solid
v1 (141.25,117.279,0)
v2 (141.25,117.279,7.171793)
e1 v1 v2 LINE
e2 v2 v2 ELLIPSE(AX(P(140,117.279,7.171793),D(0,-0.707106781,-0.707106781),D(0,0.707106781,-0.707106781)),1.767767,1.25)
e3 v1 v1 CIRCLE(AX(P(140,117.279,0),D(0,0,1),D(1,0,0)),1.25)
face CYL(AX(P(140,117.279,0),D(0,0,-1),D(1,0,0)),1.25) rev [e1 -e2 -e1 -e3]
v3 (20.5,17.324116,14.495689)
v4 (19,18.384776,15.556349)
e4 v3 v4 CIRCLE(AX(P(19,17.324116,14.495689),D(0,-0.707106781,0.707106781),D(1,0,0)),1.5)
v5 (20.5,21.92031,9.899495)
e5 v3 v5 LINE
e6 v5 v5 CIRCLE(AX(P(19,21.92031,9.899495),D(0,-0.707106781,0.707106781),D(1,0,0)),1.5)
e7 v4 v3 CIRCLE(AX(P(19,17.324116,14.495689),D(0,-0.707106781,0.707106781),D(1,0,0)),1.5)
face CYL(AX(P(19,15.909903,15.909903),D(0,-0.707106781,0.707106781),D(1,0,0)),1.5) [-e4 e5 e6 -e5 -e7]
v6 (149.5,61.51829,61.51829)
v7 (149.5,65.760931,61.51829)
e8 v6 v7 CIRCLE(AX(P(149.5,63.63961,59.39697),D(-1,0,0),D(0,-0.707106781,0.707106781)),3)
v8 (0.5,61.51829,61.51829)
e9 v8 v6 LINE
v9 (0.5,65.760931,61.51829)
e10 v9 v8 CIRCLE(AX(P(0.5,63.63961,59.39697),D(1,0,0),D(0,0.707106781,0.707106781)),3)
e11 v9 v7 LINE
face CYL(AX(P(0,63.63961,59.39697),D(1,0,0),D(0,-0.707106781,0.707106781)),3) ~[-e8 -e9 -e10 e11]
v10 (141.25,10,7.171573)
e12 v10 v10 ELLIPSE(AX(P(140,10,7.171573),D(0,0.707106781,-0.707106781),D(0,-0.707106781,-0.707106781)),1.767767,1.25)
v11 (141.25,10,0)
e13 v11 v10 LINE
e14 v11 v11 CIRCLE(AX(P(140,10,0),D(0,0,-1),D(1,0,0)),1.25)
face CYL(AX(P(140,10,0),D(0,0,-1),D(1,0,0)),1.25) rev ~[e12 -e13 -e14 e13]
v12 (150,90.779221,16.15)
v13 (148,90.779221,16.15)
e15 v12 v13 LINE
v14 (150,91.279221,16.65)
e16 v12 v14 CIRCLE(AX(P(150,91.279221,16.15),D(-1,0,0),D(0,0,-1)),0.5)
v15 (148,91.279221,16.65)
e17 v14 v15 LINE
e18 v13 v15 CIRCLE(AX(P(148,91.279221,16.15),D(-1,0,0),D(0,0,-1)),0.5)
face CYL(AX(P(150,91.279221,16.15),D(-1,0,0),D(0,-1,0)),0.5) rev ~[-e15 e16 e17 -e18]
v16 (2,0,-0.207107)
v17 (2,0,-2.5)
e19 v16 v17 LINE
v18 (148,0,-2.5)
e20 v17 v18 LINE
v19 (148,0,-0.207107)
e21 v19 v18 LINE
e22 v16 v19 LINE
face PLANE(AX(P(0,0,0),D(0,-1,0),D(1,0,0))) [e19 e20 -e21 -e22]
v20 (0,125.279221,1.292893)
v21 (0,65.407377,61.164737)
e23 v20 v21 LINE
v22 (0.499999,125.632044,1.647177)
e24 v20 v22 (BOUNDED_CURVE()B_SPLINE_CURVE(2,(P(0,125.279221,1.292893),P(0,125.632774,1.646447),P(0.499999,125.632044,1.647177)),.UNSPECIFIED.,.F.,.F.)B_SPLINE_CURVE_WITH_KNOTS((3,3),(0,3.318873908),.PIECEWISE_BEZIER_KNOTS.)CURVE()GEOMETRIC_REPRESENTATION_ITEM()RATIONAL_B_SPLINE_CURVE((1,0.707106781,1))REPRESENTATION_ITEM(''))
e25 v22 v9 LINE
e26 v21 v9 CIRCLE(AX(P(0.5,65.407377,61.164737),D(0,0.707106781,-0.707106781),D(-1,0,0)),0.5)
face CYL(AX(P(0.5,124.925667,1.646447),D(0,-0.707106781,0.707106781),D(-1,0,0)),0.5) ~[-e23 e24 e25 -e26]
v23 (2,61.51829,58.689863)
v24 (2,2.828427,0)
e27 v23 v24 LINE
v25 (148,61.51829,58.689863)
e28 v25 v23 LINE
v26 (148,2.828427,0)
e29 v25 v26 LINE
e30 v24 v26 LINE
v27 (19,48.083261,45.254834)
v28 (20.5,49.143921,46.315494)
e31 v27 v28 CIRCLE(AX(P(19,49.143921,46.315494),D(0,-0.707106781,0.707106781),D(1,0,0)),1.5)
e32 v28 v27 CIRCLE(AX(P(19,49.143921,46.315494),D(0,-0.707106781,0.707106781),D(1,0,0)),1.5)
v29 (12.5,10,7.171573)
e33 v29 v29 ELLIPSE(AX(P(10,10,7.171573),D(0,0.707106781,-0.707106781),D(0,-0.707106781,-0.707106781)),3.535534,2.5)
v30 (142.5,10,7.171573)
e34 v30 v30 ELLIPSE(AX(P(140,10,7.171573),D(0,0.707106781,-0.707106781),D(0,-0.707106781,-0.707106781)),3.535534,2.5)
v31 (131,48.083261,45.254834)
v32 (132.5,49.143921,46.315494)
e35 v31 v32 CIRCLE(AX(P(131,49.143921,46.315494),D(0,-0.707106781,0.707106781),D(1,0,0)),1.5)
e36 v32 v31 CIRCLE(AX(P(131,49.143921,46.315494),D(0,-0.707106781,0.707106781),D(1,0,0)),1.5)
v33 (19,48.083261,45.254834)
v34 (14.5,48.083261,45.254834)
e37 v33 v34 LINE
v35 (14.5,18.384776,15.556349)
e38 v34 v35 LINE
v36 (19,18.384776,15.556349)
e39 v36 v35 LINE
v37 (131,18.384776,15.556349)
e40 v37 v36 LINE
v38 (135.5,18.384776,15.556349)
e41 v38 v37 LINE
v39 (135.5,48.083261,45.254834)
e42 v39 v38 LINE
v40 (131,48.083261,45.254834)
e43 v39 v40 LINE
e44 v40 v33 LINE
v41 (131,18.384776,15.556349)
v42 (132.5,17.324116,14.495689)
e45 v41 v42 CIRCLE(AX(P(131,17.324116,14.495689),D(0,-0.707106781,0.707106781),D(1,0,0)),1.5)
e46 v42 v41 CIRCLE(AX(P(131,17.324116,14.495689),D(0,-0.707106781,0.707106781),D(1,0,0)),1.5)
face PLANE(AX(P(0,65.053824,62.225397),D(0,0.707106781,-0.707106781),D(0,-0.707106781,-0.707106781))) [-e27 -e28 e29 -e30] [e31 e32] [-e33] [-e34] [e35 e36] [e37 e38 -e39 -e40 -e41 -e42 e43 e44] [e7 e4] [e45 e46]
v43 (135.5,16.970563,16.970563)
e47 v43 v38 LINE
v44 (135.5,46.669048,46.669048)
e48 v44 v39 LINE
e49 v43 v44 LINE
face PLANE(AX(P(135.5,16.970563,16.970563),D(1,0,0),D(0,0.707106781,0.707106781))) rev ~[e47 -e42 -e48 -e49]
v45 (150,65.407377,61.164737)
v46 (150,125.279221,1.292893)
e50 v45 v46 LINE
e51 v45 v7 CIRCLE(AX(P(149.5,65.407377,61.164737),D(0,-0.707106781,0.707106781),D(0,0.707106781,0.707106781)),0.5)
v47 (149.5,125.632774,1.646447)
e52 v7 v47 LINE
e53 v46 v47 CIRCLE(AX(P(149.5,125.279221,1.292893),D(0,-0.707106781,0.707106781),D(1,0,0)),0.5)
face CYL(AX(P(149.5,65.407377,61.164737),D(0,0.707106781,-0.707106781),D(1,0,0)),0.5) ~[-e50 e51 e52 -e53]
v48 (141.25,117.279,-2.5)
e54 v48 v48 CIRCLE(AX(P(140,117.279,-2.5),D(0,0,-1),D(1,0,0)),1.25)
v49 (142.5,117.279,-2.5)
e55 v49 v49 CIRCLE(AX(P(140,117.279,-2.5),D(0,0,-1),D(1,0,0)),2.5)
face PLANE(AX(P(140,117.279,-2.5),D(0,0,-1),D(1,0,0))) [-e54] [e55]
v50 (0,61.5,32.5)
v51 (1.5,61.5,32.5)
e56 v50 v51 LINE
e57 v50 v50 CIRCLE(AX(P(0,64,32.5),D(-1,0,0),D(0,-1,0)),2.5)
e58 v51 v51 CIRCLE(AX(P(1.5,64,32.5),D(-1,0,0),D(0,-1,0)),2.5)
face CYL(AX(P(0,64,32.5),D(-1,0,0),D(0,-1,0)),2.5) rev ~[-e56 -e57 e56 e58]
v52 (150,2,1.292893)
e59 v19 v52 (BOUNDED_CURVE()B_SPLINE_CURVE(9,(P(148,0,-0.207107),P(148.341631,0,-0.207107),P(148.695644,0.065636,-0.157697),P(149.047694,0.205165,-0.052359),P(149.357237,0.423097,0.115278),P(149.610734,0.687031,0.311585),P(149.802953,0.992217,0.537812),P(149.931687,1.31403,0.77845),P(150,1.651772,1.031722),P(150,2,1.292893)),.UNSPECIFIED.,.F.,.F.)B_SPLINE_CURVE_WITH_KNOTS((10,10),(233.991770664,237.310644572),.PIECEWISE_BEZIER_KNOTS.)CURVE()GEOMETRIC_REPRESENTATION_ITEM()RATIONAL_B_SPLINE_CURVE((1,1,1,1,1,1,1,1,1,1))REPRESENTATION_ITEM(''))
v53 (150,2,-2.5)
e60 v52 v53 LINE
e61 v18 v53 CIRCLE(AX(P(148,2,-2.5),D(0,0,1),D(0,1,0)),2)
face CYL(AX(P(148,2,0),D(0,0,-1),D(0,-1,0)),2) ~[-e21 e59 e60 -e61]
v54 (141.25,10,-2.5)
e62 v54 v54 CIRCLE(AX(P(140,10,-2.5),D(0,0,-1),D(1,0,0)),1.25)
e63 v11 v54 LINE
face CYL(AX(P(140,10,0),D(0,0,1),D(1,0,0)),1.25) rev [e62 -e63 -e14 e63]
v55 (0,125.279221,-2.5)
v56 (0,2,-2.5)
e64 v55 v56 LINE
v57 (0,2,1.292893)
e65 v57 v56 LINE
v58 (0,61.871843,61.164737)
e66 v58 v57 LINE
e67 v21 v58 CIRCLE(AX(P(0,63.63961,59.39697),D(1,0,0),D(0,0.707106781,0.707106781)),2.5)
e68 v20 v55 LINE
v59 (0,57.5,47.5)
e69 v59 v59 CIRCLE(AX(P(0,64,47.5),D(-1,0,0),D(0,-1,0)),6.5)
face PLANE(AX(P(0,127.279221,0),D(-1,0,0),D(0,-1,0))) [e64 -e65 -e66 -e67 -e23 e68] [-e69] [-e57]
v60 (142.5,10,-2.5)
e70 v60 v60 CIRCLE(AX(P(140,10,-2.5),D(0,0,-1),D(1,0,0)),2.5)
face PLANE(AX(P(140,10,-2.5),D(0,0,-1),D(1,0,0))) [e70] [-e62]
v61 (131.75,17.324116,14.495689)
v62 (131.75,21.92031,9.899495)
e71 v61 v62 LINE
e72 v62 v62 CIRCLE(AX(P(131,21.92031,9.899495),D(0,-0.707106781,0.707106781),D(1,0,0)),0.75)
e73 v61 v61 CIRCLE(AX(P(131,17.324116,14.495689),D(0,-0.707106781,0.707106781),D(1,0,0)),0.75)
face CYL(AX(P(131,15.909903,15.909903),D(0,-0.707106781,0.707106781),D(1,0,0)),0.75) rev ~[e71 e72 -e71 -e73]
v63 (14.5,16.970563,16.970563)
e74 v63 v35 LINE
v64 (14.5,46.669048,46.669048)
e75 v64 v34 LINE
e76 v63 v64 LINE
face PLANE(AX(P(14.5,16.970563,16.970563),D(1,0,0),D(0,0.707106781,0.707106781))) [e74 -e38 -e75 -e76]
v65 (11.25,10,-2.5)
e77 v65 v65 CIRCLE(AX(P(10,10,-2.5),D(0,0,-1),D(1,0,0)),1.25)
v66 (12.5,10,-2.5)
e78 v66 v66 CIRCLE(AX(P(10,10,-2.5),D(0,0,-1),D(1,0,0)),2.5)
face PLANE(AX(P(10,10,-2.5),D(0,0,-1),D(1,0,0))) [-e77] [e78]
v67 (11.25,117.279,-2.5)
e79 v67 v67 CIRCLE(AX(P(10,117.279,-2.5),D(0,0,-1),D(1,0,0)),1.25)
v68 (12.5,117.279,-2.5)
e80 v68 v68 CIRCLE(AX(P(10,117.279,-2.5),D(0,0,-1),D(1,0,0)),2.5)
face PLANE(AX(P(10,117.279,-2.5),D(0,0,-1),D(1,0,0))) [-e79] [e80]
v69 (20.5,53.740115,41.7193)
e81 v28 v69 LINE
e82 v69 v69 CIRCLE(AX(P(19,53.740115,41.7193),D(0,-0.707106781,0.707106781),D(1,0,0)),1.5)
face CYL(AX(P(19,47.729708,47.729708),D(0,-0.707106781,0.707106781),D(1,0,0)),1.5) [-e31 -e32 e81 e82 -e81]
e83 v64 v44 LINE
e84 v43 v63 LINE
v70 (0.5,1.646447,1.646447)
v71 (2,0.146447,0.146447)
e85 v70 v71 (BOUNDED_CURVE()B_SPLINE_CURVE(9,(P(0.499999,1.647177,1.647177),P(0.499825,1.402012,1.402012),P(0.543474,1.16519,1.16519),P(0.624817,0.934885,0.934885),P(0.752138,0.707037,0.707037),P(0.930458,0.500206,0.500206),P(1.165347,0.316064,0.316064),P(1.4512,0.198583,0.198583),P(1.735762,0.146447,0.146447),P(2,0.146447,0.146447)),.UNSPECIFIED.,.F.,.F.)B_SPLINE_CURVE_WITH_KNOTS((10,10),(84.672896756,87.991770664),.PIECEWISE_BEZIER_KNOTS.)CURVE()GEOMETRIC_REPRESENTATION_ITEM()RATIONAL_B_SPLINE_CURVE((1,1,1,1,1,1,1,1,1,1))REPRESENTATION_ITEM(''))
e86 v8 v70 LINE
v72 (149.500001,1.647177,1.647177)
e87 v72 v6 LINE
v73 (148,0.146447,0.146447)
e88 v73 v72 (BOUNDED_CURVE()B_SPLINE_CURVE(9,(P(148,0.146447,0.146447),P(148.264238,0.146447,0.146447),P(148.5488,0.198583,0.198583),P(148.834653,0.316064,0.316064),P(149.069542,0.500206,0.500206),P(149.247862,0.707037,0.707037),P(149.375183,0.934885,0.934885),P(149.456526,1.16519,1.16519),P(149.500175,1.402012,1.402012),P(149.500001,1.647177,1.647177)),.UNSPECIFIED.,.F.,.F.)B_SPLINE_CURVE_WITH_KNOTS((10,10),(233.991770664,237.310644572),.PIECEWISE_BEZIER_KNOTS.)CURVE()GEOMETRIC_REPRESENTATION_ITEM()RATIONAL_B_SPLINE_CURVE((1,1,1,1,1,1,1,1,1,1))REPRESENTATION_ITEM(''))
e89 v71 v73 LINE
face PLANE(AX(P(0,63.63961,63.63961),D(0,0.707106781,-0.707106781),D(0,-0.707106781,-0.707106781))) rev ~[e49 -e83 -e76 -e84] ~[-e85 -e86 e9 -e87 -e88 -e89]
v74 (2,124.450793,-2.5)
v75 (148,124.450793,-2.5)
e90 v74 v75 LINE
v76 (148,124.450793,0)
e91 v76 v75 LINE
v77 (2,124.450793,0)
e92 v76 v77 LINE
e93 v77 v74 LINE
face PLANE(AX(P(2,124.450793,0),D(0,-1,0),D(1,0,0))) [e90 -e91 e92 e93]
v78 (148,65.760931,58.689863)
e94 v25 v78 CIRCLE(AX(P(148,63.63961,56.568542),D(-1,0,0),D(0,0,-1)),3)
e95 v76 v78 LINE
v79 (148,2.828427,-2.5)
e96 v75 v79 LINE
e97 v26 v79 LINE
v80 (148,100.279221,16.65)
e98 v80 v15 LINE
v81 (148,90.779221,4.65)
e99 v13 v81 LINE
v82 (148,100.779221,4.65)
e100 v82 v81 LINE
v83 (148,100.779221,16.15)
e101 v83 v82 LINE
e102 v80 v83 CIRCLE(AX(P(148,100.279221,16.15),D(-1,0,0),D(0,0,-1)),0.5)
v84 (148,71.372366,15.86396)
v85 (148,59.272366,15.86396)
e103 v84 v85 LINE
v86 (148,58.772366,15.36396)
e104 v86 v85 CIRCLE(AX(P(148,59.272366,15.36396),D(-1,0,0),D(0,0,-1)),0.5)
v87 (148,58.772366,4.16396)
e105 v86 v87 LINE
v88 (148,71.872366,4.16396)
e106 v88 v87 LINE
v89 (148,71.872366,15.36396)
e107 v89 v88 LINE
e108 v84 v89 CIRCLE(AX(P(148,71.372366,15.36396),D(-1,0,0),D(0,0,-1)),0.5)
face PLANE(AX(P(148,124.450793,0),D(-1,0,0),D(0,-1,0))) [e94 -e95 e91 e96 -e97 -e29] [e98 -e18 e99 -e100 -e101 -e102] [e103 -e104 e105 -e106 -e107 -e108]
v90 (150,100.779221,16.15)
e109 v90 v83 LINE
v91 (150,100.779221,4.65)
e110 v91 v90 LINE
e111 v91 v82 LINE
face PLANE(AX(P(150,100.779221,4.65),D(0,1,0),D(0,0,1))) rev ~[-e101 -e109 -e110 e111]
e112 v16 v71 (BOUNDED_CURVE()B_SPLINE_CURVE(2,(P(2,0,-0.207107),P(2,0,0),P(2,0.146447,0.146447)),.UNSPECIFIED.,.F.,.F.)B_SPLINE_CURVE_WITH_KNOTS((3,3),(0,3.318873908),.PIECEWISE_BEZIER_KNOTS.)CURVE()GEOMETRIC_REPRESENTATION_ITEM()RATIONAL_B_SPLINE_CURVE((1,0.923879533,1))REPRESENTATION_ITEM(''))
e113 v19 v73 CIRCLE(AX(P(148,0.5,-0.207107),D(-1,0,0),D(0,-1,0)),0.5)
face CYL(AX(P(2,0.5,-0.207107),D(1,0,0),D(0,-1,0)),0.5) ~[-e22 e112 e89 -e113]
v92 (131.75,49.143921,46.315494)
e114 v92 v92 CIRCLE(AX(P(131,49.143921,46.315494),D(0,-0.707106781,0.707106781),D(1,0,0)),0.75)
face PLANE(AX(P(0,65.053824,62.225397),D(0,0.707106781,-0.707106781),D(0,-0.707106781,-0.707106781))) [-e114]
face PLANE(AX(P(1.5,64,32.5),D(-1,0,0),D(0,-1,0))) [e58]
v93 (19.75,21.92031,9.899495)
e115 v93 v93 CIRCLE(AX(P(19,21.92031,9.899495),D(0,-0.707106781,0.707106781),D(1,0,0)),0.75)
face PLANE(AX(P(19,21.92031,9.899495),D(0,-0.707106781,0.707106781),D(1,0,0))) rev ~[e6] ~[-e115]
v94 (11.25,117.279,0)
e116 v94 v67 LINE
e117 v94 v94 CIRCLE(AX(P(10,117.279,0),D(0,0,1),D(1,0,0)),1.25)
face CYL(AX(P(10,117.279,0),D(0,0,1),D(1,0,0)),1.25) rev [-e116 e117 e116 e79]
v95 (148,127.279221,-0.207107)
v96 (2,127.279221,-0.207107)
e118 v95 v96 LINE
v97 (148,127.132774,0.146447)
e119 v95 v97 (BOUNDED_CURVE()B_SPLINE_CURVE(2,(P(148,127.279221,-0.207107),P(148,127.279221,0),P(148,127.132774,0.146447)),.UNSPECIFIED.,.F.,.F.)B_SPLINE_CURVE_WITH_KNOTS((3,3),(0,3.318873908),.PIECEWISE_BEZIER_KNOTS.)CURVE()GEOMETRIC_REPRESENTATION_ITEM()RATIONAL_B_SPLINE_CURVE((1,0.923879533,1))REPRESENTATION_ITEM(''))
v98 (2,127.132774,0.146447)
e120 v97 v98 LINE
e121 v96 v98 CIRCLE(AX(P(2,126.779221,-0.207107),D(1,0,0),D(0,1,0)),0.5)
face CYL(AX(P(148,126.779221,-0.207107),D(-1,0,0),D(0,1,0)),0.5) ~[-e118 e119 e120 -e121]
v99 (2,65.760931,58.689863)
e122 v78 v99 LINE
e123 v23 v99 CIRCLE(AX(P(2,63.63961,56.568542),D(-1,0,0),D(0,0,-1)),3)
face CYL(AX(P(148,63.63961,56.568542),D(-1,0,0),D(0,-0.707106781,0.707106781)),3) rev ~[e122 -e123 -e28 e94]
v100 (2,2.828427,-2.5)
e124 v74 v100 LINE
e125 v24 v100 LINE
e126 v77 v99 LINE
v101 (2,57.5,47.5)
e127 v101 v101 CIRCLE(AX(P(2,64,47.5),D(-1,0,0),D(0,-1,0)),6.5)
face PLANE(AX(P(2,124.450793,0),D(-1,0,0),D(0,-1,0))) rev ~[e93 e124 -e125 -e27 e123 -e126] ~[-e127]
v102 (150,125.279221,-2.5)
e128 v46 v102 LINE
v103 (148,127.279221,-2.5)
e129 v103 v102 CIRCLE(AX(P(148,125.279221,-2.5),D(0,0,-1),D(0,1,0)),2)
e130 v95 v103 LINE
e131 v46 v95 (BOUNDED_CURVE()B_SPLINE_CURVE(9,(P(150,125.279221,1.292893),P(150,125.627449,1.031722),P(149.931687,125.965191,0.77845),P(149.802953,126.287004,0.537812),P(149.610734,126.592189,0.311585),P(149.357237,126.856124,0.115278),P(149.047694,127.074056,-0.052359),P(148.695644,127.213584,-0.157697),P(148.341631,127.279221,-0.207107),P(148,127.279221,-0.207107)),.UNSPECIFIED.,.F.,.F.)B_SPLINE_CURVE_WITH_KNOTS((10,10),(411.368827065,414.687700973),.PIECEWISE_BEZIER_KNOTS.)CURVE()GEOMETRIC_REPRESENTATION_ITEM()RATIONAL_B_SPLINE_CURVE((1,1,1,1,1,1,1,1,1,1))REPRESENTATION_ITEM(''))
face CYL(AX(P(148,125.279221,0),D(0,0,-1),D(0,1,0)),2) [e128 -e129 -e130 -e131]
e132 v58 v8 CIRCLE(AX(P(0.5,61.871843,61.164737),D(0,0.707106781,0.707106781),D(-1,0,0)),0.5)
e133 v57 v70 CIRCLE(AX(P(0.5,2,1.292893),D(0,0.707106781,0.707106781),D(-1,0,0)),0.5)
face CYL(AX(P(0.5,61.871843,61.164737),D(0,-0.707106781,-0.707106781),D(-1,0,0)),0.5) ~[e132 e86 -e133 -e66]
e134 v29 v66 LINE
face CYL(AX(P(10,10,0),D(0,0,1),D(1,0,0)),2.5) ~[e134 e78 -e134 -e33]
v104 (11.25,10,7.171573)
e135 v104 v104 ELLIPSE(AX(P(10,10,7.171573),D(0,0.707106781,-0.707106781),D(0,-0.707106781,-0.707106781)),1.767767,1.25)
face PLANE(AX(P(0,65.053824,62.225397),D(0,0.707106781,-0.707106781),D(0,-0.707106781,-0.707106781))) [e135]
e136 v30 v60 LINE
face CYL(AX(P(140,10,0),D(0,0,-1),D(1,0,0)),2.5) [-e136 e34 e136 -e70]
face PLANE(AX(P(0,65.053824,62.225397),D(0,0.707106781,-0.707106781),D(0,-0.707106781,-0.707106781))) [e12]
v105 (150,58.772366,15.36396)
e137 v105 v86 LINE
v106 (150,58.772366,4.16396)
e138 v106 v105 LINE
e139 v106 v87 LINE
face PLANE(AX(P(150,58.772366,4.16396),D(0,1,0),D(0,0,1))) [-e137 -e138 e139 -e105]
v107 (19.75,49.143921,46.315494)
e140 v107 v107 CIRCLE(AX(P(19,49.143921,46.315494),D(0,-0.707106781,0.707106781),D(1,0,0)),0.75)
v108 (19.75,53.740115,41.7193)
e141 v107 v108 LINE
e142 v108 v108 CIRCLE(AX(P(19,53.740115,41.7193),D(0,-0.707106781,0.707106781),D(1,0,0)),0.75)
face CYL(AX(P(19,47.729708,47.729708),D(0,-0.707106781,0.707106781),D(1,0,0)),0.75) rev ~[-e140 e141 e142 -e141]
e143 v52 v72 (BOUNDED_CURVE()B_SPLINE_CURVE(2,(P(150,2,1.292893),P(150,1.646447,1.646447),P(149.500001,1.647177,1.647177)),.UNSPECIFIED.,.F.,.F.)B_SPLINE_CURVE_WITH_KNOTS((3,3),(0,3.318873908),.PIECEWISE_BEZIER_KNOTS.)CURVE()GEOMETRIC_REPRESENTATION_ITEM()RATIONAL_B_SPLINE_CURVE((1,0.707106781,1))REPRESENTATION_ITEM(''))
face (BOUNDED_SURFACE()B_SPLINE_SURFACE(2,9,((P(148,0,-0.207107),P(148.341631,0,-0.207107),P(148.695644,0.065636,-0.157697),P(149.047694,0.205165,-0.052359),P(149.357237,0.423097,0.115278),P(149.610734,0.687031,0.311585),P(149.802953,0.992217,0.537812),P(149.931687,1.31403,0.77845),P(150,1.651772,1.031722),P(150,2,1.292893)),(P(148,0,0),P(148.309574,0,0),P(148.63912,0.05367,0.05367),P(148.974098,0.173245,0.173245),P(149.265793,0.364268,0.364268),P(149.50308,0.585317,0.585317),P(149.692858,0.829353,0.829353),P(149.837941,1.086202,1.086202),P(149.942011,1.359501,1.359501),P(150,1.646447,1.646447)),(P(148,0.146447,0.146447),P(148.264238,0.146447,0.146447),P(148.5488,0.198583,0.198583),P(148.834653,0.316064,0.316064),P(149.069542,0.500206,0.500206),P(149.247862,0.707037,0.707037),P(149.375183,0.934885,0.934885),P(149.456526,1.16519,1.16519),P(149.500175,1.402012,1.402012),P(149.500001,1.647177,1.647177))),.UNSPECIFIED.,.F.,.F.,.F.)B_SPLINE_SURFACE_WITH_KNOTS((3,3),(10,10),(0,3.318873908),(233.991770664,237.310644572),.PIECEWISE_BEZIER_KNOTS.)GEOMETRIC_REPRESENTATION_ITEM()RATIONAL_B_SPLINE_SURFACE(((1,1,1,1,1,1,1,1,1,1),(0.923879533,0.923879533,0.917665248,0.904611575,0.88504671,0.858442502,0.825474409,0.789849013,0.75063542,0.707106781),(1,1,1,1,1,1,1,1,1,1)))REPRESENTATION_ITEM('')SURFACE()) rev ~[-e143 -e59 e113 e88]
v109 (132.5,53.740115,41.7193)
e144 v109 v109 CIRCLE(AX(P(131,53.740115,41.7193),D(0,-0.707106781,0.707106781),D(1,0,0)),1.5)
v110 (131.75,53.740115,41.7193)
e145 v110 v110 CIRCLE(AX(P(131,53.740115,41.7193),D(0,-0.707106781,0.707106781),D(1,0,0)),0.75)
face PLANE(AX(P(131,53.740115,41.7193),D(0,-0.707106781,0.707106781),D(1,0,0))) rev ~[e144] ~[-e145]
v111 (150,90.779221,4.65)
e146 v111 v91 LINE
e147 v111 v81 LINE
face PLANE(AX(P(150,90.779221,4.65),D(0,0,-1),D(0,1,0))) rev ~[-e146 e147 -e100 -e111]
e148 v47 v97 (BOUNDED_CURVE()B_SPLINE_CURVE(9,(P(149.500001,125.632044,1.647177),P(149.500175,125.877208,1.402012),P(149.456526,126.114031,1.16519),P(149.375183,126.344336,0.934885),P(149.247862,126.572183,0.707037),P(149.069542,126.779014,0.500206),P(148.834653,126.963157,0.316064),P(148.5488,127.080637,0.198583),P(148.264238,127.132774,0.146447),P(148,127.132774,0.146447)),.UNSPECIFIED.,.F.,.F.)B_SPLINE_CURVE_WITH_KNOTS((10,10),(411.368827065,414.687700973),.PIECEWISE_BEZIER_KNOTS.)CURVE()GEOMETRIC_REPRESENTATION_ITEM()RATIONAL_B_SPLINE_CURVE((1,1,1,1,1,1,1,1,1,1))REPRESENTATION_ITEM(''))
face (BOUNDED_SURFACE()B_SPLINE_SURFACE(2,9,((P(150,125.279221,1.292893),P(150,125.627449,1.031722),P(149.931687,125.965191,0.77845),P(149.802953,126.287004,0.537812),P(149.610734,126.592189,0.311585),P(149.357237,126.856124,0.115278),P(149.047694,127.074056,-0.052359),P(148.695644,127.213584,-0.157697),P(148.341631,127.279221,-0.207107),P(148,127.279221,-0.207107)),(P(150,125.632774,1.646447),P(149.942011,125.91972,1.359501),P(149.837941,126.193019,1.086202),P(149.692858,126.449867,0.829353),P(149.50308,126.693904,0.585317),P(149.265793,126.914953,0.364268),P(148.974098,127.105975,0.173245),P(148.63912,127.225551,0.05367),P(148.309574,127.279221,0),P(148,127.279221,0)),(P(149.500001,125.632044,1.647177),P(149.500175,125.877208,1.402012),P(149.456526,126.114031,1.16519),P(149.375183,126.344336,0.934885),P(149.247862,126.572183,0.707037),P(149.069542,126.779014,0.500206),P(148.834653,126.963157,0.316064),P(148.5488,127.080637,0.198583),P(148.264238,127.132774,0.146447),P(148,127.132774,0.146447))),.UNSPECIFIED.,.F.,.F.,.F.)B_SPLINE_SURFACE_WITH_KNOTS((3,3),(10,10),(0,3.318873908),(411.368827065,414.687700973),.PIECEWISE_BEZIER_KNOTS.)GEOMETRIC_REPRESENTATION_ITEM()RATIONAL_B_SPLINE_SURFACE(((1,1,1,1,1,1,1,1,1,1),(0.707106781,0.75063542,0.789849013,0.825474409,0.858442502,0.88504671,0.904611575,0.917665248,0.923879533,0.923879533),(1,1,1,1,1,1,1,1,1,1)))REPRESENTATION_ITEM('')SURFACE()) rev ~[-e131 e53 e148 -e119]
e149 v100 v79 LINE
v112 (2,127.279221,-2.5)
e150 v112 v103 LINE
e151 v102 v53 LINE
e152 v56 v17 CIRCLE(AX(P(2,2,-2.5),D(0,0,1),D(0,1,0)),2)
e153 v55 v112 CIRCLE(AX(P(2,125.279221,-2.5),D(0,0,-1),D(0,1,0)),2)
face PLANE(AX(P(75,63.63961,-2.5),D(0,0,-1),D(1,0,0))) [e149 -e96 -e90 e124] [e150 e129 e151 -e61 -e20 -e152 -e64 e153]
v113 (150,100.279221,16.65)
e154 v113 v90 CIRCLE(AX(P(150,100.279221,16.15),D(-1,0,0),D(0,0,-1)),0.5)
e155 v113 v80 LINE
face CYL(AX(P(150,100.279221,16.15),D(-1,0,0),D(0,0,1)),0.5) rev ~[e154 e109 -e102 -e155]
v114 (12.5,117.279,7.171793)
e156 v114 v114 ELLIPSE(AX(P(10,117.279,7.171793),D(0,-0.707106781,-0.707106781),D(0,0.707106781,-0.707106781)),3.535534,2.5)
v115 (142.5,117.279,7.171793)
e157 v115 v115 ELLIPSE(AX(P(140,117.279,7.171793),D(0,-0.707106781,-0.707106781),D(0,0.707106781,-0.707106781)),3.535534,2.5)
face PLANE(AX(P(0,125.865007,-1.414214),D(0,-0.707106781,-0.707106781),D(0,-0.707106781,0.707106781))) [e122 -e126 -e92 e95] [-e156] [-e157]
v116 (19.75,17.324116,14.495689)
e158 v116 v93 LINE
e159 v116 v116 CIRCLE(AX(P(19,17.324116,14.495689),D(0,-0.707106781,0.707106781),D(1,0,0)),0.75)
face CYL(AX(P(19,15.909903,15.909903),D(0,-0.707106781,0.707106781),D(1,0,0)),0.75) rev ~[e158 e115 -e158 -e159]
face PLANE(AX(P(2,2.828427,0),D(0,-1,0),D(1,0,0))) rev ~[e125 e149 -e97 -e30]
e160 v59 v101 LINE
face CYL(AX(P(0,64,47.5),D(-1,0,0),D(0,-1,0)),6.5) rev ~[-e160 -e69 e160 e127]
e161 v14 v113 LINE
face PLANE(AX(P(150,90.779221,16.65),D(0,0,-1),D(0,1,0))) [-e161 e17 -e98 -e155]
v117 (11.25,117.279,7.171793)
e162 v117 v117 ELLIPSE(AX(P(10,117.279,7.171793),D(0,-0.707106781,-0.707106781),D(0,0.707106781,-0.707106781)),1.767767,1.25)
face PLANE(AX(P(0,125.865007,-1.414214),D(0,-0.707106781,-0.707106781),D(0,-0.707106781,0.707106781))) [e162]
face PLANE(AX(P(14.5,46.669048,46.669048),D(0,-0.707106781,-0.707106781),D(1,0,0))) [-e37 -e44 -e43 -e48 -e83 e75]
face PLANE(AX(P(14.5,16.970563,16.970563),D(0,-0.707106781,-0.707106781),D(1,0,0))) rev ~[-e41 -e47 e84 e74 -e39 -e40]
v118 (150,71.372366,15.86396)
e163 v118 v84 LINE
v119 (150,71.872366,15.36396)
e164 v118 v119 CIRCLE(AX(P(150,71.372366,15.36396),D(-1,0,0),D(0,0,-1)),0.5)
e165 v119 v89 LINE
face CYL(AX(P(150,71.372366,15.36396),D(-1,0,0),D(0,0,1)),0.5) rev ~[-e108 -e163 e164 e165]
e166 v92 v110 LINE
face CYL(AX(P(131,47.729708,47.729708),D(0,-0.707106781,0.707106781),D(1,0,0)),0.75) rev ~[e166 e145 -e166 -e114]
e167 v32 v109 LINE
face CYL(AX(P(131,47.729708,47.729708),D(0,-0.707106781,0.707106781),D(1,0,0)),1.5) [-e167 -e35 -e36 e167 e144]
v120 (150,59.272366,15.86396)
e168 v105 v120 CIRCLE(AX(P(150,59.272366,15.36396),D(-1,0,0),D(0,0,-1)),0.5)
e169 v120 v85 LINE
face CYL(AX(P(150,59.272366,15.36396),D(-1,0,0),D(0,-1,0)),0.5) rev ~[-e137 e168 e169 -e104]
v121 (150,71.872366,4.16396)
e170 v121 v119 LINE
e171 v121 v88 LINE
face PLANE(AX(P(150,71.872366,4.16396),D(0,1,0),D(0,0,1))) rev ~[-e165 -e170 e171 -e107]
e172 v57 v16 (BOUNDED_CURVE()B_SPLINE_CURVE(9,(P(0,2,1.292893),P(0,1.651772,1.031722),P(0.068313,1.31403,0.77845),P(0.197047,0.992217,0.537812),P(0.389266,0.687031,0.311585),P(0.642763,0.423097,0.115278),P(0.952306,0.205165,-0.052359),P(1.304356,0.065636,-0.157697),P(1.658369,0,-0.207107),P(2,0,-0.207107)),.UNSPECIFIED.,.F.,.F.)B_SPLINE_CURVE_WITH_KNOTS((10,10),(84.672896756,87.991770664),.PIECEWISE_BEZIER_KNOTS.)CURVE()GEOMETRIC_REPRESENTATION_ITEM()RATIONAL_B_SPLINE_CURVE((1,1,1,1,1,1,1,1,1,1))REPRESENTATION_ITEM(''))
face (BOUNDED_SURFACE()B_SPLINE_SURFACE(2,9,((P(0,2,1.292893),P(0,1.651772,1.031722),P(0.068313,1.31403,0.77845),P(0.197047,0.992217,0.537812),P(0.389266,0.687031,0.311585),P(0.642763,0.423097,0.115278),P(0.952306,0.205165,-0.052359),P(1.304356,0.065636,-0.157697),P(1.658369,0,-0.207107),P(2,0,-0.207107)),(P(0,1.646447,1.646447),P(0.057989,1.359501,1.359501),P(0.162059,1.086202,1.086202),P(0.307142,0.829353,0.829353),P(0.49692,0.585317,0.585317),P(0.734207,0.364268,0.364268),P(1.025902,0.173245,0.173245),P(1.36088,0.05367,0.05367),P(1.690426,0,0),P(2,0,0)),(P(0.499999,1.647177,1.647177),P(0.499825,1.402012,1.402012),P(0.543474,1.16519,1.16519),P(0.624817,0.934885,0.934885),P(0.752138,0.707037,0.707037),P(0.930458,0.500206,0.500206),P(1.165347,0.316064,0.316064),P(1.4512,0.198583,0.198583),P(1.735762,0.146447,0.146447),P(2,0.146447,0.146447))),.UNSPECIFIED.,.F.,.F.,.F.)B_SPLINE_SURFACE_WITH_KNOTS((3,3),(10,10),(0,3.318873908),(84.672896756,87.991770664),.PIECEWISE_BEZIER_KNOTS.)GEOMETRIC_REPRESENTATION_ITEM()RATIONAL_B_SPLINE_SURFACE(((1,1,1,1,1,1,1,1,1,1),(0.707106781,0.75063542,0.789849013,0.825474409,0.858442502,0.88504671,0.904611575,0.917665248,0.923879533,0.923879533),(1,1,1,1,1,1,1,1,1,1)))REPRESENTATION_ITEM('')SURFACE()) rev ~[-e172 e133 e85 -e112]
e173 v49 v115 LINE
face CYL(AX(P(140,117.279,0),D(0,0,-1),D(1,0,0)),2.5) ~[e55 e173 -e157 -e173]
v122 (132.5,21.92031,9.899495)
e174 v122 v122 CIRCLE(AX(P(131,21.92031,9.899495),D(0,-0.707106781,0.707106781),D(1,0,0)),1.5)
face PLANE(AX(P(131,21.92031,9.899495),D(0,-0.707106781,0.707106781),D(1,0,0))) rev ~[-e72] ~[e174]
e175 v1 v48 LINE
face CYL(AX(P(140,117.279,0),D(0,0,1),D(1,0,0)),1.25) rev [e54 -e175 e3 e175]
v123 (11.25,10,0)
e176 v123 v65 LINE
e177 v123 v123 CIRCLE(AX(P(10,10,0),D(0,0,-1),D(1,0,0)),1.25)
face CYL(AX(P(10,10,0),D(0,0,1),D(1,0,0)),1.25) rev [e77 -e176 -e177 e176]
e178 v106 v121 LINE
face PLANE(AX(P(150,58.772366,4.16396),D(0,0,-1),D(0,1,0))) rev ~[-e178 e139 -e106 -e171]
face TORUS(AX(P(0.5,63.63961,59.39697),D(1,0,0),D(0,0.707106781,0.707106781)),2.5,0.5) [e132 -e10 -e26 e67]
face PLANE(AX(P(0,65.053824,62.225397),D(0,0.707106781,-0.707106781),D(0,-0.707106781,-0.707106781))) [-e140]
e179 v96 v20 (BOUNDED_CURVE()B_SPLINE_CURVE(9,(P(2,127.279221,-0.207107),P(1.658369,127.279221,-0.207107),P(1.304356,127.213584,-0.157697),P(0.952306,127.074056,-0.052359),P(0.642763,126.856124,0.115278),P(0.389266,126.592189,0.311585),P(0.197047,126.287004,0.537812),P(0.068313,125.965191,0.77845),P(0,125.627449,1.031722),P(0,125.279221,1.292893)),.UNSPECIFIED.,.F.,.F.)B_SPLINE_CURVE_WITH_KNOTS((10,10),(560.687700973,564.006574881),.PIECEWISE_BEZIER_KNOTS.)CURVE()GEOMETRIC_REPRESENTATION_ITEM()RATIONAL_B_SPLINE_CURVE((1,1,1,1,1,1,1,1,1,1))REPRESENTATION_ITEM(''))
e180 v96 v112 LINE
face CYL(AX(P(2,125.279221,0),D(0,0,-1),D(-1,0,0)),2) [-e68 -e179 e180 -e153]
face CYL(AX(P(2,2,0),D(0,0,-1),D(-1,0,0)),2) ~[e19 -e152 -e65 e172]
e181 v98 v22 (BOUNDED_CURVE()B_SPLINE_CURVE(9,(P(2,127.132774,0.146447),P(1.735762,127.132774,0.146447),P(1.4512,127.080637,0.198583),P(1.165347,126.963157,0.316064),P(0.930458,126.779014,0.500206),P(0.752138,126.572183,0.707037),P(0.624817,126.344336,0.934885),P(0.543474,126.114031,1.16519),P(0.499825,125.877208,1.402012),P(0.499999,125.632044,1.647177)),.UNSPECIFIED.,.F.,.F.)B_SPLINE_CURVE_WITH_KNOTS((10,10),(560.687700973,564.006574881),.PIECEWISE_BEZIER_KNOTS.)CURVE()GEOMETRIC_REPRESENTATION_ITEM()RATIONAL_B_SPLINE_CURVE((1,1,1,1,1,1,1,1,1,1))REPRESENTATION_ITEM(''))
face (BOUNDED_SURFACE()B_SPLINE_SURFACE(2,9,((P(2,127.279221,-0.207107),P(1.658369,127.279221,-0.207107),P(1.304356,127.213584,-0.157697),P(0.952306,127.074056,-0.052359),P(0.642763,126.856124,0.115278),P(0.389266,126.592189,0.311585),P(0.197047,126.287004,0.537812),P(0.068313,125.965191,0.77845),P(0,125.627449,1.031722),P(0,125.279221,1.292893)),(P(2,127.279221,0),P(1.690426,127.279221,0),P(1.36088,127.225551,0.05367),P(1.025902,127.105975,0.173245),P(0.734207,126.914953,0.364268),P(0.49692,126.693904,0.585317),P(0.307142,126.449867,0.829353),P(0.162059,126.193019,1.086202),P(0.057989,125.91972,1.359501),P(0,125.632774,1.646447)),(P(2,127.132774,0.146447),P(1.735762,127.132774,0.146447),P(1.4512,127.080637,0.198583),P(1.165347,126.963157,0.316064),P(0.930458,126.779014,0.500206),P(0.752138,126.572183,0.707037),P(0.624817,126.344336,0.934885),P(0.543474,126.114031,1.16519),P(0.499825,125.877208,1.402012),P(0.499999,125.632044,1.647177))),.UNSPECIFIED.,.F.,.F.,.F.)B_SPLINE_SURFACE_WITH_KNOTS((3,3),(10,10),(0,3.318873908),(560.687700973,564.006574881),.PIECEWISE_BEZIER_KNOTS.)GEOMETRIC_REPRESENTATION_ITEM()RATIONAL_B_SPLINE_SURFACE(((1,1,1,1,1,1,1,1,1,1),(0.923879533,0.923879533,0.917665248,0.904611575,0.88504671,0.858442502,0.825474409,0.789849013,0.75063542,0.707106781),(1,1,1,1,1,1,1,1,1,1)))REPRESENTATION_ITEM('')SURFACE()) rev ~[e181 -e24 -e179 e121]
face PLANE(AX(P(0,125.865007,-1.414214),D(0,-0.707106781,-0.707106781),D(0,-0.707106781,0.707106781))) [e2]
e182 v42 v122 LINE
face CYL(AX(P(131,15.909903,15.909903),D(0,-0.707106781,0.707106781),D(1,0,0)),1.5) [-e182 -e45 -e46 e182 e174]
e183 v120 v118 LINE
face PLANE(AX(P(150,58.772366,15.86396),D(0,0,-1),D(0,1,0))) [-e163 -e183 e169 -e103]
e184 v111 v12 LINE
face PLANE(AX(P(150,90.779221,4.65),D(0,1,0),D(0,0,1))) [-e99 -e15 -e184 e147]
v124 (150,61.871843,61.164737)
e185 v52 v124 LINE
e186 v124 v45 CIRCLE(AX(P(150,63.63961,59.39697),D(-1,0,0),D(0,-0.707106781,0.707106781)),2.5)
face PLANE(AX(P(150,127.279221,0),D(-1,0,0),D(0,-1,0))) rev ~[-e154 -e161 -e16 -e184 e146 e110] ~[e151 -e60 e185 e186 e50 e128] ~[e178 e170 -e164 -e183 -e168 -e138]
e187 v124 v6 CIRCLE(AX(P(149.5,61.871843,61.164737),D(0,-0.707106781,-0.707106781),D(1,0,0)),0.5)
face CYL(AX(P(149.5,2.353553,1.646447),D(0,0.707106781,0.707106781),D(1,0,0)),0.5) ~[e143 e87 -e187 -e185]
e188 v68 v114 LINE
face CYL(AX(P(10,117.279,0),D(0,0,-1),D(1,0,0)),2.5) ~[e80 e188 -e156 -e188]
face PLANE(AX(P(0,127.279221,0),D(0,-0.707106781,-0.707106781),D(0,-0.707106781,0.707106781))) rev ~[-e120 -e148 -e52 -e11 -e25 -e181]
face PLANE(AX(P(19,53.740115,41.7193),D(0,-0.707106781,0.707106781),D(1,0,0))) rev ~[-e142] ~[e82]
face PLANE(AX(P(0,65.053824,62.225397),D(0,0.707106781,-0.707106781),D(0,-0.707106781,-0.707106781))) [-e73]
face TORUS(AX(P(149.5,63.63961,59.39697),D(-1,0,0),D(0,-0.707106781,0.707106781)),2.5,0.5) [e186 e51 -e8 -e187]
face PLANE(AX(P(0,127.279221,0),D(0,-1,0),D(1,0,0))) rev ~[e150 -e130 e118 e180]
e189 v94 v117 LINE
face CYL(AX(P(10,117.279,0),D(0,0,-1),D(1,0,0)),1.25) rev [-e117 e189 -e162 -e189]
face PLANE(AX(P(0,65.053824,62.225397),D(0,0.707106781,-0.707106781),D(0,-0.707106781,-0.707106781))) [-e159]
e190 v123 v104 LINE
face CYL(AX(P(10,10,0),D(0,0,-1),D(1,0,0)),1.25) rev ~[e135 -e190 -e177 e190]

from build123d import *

# Parameters (mm, degrees)
F1_DEPTH  = 150
F2_T      = -2
F4_W      = 121
F4_H      = 42
F5_DEPTH  = 3
F6_R      = 3
F8_R      = 1.5
F8_R_2    = 0.75
F9_DEPTH  = 8.5
F10_R     = 2.5
F10_R_2   = 1.5
F12_R     = 2.5
F12_R_2   = 1.25
F13_REACH = 69.4690374315
F14_W     = 150
F14_H     = 127.2792206136
F14_W_2   = 146
F14_H_2   = 121.6223663641
F15_DEPTH = 2.5
F16_R     = 2.5
F16_R_2   = 1.25
F18_R     = 2
F19_R     = 0.5
F7_W      = 10
F7_H      = 12
F7_W_2    = 13.1
F7_H_2    = 11.7
F20_DEPTH = 3
F21_R     = 0.5
F22_R     = 0.5
F23_R     = 6.5
F24_DEPTH = 2.5
F25_R     = 2.5
F25_R_2   = 1.25
F26_DEPTH = 2.5
F27_R     = 2.5
F28_DEPTH = 1.5
F29_R     = 3


with BuildPart() as f1:
    # F0 (on Right) → F1 (new body)
    with BuildSketch(Plane.YZ):
        Polygon((63.6396103068, 63.6396103068), (0, 0), (127.2792206136, 0), align=None)
    extrude(amount=F1_DEPTH)

    # F2
    f2_openings = [f1.faces().sort_by_distance(p)[0] for p in [
        (75, 63.63961, 0),
    ]]
    offset(amount=F2_T, openings=f2_openings)

    # F4 (on offset) → F5 (cut)
    with BuildSketch(Plane(origin=(0, 0, 0), x_dir=(1, 0, 0), z_dir=(0, -0.7071067812, 0.7071067812))):
        with Locations((75, 45)):
            Rectangle(F4_W, F4_H)
    extrude(amount=-F5_DEPTH, mode=Mode.SUBTRACT)

    # F6
    f6_edges = [f1.edges().sort_by_distance(p)[0] for p in [
        (75, 63.63961, 63.63961),
    ]]
    fillet(f6_edges, radius=F6_R)

    # F8 (on face) → F9 (join)
    with BuildSketch(Plane(origin=(0, 0, 0), x_dir=(1, 0, 0), z_dir=(0, -0.7071067812, 0.7071067812))):
        with Locations((131, 67.5)):
            Circle(F8_R)
        with Locations((131, 67.5)):
            Circle(F8_R_2, mode=Mode.SUBTRACT)
        with Locations((131, 22.5)):
            Circle(F8_R)
        with Locations((131, 22.5)):
            Circle(F8_R_2, mode=Mode.SUBTRACT)
        with Locations((19, 67.5)):
            Circle(F8_R)
        with Locations((19, 67.5)):
            Circle(F8_R_2, mode=Mode.SUBTRACT)
        with Locations((19, 22.5)):
            Circle(F8_R)
        with Locations((19, 22.5)):
            Circle(F8_R_2, mode=Mode.SUBTRACT)
    extrude(amount=-F9_DEPTH)

    # F10 (on face) → F11 (join, up to the last surface of F1)
    with BuildSketch(Plane(origin=(0, 0, 0), x_dir=(1, 0, 0), z_dir=(0, 0, -1))):
        with Locations((10, -10)):
            Circle(F10_R)
        with Locations((10, -10)):
            Circle(F10_R_2, mode=Mode.SUBTRACT)
    extrude(until=Until.LAST, dir=(0, 0, 1))

    f13_end = Plane(origin=(75.2433178079, 33.3209918004, 30.4925646757), x_dir=(0, 0.7071067812, 0.7071067812), z_dir=(0, 0.7071067812, -0.7071067812))
    # F12 (on face) → F13 (join, up to a plane its end follows)
    with BuildSketch(Plane(origin=(0, 0, 0), x_dir=(1, 0, 0), z_dir=(0, 0, -1))):
        with Locations((10, -10)):
            Circle(F12_R)
        with Locations((10, -10)):
            Circle(F12_R_2, mode=Mode.SUBTRACT)
        with Locations((140, -10)):
            Circle(F12_R)
        with Locations((140, -10)):
            Circle(F12_R_2, mode=Mode.SUBTRACT)
    f13_long = extrude(amount=-F13_REACH, mode=Mode.PRIVATE)
    add(split(f13_long, bisect_by=f13_end, keep=Keep.TOP, mode=Mode.PRIVATE))

    # F14 (on face) → F15 (join)
    with BuildSketch(Plane(origin=(0, 0, 0), x_dir=(1, 0, 0), z_dir=(0, 0, -1))):
        with Locations((75, -63.6396103068)):
            Rectangle(F14_W, F14_H)
        with Locations((75, -63.6396103068)):
            Rectangle(F14_W_2, F14_H_2, mode=Mode.SUBTRACT)
    extrude(amount=F15_DEPTH)

    # F16 (on Top) → F17 (join, up to the next surface of F1)
    with BuildSketch(Plane.XY):
        with Locations((140, 117.279)):
            Circle(F16_R)
        with Locations((140, 117.279)):
            Circle(F16_R_2, mode=Mode.SUBTRACT)
        with Locations((10, 117.279)):
            Circle(F16_R)
        with Locations((10, 117.279)):
            Circle(F16_R_2, mode=Mode.SUBTRACT)
    extrude(until=Until.NEXT)

    # F18
    f18_edges = [f1.edges().sort_by_distance(p)[0] for p in [
        (150, 127.279221, -1.25),
        (150, 0, -1.25),
        (0, 0, -1.25),
        (0, 127.279221, -1.25),
    ]]
    fillet(f18_edges, radius=F18_R)

    # F19
    f19_edges = [f1.edges().sort_by_distance(p)[0] for p in [
        (0, 31.759145, 31.759145),
    ]]
    fillet(f19_edges, radius=F19_R)

    # F7 (on face) → F20 (cut)
    with BuildSketch(Plane.YZ.offset(150)):
        with Locations((95.7792206136, 10.65)):
            Rectangle(F7_W, F7_H)
        with Locations((65.3223664939, 10.0139604606)):
            Rectangle(F7_W_2, F7_H_2)
    extrude(amount=-F20_DEPTH, mode=Mode.SUBTRACT)

    # F21
    f21_edges = [f1.edges().sort_by_distance(p)[0] for p in [
        (149, 90.779221, 16.65),
        (149, 100.779221, 16.65),
    ]]
    fillet(f21_edges, radius=F21_R)

    # F22
    f22_edges = [f1.edges().sort_by_distance(p)[0] for p in [
        (149, 71.872366, 15.86396),
        (149, 58.772366, 15.86396),
    ]]
    fillet(f22_edges, radius=F22_R)

    # F23 (on face) → F24 (cut)
    with BuildSketch(Plane(origin=(0, 0, 0), x_dir=(0, -1, 0), z_dir=(-1, 0, 0))):
        with Locations((-64, 47.5)):
            Circle(F23_R)
    extrude(amount=-F24_DEPTH, mode=Mode.SUBTRACT)

    # F25 (on face) → F26 (join)
    with BuildSketch(Plane(origin=(0, 0, 0), x_dir=(1, 0, 0), z_dir=(0, 0, -1))):
        with Locations((10, -10)):
            Circle(F25_R)
        with Locations((10, -10)):
            Circle(F25_R_2, mode=Mode.SUBTRACT)
        with Locations((140, -10)):
            Circle(F25_R)
        with Locations((140, -10)):
            Circle(F25_R_2, mode=Mode.SUBTRACT)
        with Locations((10, -117.279)):
            Circle(F25_R)
        with Locations((10, -117.279)):
            Circle(F25_R_2, mode=Mode.SUBTRACT)
        with Locations((140, -117.279)):
            Circle(F25_R)
        with Locations((140, -117.279)):
            Circle(F25_R_2, mode=Mode.SUBTRACT)
    extrude(amount=F26_DEPTH)

    # F27 (on face) → F28 (cut)
    with BuildSketch(Plane(origin=(0, 0, 0), x_dir=(0, -1, 0), z_dir=(-1, 0, 0))):
        with Locations((-64, 32.5)):
            Circle(F27_R)
    extrude(amount=-F28_DEPTH, mode=Mode.SUBTRACT)

    # F29
    f29_edges = [f1.edges().sort_by_distance(p)[0] for p in [
        (75, 63.63961, 60.811183),
    ]]
    fillet(f29_edges, radius=F29_R)


solid = f1.part
